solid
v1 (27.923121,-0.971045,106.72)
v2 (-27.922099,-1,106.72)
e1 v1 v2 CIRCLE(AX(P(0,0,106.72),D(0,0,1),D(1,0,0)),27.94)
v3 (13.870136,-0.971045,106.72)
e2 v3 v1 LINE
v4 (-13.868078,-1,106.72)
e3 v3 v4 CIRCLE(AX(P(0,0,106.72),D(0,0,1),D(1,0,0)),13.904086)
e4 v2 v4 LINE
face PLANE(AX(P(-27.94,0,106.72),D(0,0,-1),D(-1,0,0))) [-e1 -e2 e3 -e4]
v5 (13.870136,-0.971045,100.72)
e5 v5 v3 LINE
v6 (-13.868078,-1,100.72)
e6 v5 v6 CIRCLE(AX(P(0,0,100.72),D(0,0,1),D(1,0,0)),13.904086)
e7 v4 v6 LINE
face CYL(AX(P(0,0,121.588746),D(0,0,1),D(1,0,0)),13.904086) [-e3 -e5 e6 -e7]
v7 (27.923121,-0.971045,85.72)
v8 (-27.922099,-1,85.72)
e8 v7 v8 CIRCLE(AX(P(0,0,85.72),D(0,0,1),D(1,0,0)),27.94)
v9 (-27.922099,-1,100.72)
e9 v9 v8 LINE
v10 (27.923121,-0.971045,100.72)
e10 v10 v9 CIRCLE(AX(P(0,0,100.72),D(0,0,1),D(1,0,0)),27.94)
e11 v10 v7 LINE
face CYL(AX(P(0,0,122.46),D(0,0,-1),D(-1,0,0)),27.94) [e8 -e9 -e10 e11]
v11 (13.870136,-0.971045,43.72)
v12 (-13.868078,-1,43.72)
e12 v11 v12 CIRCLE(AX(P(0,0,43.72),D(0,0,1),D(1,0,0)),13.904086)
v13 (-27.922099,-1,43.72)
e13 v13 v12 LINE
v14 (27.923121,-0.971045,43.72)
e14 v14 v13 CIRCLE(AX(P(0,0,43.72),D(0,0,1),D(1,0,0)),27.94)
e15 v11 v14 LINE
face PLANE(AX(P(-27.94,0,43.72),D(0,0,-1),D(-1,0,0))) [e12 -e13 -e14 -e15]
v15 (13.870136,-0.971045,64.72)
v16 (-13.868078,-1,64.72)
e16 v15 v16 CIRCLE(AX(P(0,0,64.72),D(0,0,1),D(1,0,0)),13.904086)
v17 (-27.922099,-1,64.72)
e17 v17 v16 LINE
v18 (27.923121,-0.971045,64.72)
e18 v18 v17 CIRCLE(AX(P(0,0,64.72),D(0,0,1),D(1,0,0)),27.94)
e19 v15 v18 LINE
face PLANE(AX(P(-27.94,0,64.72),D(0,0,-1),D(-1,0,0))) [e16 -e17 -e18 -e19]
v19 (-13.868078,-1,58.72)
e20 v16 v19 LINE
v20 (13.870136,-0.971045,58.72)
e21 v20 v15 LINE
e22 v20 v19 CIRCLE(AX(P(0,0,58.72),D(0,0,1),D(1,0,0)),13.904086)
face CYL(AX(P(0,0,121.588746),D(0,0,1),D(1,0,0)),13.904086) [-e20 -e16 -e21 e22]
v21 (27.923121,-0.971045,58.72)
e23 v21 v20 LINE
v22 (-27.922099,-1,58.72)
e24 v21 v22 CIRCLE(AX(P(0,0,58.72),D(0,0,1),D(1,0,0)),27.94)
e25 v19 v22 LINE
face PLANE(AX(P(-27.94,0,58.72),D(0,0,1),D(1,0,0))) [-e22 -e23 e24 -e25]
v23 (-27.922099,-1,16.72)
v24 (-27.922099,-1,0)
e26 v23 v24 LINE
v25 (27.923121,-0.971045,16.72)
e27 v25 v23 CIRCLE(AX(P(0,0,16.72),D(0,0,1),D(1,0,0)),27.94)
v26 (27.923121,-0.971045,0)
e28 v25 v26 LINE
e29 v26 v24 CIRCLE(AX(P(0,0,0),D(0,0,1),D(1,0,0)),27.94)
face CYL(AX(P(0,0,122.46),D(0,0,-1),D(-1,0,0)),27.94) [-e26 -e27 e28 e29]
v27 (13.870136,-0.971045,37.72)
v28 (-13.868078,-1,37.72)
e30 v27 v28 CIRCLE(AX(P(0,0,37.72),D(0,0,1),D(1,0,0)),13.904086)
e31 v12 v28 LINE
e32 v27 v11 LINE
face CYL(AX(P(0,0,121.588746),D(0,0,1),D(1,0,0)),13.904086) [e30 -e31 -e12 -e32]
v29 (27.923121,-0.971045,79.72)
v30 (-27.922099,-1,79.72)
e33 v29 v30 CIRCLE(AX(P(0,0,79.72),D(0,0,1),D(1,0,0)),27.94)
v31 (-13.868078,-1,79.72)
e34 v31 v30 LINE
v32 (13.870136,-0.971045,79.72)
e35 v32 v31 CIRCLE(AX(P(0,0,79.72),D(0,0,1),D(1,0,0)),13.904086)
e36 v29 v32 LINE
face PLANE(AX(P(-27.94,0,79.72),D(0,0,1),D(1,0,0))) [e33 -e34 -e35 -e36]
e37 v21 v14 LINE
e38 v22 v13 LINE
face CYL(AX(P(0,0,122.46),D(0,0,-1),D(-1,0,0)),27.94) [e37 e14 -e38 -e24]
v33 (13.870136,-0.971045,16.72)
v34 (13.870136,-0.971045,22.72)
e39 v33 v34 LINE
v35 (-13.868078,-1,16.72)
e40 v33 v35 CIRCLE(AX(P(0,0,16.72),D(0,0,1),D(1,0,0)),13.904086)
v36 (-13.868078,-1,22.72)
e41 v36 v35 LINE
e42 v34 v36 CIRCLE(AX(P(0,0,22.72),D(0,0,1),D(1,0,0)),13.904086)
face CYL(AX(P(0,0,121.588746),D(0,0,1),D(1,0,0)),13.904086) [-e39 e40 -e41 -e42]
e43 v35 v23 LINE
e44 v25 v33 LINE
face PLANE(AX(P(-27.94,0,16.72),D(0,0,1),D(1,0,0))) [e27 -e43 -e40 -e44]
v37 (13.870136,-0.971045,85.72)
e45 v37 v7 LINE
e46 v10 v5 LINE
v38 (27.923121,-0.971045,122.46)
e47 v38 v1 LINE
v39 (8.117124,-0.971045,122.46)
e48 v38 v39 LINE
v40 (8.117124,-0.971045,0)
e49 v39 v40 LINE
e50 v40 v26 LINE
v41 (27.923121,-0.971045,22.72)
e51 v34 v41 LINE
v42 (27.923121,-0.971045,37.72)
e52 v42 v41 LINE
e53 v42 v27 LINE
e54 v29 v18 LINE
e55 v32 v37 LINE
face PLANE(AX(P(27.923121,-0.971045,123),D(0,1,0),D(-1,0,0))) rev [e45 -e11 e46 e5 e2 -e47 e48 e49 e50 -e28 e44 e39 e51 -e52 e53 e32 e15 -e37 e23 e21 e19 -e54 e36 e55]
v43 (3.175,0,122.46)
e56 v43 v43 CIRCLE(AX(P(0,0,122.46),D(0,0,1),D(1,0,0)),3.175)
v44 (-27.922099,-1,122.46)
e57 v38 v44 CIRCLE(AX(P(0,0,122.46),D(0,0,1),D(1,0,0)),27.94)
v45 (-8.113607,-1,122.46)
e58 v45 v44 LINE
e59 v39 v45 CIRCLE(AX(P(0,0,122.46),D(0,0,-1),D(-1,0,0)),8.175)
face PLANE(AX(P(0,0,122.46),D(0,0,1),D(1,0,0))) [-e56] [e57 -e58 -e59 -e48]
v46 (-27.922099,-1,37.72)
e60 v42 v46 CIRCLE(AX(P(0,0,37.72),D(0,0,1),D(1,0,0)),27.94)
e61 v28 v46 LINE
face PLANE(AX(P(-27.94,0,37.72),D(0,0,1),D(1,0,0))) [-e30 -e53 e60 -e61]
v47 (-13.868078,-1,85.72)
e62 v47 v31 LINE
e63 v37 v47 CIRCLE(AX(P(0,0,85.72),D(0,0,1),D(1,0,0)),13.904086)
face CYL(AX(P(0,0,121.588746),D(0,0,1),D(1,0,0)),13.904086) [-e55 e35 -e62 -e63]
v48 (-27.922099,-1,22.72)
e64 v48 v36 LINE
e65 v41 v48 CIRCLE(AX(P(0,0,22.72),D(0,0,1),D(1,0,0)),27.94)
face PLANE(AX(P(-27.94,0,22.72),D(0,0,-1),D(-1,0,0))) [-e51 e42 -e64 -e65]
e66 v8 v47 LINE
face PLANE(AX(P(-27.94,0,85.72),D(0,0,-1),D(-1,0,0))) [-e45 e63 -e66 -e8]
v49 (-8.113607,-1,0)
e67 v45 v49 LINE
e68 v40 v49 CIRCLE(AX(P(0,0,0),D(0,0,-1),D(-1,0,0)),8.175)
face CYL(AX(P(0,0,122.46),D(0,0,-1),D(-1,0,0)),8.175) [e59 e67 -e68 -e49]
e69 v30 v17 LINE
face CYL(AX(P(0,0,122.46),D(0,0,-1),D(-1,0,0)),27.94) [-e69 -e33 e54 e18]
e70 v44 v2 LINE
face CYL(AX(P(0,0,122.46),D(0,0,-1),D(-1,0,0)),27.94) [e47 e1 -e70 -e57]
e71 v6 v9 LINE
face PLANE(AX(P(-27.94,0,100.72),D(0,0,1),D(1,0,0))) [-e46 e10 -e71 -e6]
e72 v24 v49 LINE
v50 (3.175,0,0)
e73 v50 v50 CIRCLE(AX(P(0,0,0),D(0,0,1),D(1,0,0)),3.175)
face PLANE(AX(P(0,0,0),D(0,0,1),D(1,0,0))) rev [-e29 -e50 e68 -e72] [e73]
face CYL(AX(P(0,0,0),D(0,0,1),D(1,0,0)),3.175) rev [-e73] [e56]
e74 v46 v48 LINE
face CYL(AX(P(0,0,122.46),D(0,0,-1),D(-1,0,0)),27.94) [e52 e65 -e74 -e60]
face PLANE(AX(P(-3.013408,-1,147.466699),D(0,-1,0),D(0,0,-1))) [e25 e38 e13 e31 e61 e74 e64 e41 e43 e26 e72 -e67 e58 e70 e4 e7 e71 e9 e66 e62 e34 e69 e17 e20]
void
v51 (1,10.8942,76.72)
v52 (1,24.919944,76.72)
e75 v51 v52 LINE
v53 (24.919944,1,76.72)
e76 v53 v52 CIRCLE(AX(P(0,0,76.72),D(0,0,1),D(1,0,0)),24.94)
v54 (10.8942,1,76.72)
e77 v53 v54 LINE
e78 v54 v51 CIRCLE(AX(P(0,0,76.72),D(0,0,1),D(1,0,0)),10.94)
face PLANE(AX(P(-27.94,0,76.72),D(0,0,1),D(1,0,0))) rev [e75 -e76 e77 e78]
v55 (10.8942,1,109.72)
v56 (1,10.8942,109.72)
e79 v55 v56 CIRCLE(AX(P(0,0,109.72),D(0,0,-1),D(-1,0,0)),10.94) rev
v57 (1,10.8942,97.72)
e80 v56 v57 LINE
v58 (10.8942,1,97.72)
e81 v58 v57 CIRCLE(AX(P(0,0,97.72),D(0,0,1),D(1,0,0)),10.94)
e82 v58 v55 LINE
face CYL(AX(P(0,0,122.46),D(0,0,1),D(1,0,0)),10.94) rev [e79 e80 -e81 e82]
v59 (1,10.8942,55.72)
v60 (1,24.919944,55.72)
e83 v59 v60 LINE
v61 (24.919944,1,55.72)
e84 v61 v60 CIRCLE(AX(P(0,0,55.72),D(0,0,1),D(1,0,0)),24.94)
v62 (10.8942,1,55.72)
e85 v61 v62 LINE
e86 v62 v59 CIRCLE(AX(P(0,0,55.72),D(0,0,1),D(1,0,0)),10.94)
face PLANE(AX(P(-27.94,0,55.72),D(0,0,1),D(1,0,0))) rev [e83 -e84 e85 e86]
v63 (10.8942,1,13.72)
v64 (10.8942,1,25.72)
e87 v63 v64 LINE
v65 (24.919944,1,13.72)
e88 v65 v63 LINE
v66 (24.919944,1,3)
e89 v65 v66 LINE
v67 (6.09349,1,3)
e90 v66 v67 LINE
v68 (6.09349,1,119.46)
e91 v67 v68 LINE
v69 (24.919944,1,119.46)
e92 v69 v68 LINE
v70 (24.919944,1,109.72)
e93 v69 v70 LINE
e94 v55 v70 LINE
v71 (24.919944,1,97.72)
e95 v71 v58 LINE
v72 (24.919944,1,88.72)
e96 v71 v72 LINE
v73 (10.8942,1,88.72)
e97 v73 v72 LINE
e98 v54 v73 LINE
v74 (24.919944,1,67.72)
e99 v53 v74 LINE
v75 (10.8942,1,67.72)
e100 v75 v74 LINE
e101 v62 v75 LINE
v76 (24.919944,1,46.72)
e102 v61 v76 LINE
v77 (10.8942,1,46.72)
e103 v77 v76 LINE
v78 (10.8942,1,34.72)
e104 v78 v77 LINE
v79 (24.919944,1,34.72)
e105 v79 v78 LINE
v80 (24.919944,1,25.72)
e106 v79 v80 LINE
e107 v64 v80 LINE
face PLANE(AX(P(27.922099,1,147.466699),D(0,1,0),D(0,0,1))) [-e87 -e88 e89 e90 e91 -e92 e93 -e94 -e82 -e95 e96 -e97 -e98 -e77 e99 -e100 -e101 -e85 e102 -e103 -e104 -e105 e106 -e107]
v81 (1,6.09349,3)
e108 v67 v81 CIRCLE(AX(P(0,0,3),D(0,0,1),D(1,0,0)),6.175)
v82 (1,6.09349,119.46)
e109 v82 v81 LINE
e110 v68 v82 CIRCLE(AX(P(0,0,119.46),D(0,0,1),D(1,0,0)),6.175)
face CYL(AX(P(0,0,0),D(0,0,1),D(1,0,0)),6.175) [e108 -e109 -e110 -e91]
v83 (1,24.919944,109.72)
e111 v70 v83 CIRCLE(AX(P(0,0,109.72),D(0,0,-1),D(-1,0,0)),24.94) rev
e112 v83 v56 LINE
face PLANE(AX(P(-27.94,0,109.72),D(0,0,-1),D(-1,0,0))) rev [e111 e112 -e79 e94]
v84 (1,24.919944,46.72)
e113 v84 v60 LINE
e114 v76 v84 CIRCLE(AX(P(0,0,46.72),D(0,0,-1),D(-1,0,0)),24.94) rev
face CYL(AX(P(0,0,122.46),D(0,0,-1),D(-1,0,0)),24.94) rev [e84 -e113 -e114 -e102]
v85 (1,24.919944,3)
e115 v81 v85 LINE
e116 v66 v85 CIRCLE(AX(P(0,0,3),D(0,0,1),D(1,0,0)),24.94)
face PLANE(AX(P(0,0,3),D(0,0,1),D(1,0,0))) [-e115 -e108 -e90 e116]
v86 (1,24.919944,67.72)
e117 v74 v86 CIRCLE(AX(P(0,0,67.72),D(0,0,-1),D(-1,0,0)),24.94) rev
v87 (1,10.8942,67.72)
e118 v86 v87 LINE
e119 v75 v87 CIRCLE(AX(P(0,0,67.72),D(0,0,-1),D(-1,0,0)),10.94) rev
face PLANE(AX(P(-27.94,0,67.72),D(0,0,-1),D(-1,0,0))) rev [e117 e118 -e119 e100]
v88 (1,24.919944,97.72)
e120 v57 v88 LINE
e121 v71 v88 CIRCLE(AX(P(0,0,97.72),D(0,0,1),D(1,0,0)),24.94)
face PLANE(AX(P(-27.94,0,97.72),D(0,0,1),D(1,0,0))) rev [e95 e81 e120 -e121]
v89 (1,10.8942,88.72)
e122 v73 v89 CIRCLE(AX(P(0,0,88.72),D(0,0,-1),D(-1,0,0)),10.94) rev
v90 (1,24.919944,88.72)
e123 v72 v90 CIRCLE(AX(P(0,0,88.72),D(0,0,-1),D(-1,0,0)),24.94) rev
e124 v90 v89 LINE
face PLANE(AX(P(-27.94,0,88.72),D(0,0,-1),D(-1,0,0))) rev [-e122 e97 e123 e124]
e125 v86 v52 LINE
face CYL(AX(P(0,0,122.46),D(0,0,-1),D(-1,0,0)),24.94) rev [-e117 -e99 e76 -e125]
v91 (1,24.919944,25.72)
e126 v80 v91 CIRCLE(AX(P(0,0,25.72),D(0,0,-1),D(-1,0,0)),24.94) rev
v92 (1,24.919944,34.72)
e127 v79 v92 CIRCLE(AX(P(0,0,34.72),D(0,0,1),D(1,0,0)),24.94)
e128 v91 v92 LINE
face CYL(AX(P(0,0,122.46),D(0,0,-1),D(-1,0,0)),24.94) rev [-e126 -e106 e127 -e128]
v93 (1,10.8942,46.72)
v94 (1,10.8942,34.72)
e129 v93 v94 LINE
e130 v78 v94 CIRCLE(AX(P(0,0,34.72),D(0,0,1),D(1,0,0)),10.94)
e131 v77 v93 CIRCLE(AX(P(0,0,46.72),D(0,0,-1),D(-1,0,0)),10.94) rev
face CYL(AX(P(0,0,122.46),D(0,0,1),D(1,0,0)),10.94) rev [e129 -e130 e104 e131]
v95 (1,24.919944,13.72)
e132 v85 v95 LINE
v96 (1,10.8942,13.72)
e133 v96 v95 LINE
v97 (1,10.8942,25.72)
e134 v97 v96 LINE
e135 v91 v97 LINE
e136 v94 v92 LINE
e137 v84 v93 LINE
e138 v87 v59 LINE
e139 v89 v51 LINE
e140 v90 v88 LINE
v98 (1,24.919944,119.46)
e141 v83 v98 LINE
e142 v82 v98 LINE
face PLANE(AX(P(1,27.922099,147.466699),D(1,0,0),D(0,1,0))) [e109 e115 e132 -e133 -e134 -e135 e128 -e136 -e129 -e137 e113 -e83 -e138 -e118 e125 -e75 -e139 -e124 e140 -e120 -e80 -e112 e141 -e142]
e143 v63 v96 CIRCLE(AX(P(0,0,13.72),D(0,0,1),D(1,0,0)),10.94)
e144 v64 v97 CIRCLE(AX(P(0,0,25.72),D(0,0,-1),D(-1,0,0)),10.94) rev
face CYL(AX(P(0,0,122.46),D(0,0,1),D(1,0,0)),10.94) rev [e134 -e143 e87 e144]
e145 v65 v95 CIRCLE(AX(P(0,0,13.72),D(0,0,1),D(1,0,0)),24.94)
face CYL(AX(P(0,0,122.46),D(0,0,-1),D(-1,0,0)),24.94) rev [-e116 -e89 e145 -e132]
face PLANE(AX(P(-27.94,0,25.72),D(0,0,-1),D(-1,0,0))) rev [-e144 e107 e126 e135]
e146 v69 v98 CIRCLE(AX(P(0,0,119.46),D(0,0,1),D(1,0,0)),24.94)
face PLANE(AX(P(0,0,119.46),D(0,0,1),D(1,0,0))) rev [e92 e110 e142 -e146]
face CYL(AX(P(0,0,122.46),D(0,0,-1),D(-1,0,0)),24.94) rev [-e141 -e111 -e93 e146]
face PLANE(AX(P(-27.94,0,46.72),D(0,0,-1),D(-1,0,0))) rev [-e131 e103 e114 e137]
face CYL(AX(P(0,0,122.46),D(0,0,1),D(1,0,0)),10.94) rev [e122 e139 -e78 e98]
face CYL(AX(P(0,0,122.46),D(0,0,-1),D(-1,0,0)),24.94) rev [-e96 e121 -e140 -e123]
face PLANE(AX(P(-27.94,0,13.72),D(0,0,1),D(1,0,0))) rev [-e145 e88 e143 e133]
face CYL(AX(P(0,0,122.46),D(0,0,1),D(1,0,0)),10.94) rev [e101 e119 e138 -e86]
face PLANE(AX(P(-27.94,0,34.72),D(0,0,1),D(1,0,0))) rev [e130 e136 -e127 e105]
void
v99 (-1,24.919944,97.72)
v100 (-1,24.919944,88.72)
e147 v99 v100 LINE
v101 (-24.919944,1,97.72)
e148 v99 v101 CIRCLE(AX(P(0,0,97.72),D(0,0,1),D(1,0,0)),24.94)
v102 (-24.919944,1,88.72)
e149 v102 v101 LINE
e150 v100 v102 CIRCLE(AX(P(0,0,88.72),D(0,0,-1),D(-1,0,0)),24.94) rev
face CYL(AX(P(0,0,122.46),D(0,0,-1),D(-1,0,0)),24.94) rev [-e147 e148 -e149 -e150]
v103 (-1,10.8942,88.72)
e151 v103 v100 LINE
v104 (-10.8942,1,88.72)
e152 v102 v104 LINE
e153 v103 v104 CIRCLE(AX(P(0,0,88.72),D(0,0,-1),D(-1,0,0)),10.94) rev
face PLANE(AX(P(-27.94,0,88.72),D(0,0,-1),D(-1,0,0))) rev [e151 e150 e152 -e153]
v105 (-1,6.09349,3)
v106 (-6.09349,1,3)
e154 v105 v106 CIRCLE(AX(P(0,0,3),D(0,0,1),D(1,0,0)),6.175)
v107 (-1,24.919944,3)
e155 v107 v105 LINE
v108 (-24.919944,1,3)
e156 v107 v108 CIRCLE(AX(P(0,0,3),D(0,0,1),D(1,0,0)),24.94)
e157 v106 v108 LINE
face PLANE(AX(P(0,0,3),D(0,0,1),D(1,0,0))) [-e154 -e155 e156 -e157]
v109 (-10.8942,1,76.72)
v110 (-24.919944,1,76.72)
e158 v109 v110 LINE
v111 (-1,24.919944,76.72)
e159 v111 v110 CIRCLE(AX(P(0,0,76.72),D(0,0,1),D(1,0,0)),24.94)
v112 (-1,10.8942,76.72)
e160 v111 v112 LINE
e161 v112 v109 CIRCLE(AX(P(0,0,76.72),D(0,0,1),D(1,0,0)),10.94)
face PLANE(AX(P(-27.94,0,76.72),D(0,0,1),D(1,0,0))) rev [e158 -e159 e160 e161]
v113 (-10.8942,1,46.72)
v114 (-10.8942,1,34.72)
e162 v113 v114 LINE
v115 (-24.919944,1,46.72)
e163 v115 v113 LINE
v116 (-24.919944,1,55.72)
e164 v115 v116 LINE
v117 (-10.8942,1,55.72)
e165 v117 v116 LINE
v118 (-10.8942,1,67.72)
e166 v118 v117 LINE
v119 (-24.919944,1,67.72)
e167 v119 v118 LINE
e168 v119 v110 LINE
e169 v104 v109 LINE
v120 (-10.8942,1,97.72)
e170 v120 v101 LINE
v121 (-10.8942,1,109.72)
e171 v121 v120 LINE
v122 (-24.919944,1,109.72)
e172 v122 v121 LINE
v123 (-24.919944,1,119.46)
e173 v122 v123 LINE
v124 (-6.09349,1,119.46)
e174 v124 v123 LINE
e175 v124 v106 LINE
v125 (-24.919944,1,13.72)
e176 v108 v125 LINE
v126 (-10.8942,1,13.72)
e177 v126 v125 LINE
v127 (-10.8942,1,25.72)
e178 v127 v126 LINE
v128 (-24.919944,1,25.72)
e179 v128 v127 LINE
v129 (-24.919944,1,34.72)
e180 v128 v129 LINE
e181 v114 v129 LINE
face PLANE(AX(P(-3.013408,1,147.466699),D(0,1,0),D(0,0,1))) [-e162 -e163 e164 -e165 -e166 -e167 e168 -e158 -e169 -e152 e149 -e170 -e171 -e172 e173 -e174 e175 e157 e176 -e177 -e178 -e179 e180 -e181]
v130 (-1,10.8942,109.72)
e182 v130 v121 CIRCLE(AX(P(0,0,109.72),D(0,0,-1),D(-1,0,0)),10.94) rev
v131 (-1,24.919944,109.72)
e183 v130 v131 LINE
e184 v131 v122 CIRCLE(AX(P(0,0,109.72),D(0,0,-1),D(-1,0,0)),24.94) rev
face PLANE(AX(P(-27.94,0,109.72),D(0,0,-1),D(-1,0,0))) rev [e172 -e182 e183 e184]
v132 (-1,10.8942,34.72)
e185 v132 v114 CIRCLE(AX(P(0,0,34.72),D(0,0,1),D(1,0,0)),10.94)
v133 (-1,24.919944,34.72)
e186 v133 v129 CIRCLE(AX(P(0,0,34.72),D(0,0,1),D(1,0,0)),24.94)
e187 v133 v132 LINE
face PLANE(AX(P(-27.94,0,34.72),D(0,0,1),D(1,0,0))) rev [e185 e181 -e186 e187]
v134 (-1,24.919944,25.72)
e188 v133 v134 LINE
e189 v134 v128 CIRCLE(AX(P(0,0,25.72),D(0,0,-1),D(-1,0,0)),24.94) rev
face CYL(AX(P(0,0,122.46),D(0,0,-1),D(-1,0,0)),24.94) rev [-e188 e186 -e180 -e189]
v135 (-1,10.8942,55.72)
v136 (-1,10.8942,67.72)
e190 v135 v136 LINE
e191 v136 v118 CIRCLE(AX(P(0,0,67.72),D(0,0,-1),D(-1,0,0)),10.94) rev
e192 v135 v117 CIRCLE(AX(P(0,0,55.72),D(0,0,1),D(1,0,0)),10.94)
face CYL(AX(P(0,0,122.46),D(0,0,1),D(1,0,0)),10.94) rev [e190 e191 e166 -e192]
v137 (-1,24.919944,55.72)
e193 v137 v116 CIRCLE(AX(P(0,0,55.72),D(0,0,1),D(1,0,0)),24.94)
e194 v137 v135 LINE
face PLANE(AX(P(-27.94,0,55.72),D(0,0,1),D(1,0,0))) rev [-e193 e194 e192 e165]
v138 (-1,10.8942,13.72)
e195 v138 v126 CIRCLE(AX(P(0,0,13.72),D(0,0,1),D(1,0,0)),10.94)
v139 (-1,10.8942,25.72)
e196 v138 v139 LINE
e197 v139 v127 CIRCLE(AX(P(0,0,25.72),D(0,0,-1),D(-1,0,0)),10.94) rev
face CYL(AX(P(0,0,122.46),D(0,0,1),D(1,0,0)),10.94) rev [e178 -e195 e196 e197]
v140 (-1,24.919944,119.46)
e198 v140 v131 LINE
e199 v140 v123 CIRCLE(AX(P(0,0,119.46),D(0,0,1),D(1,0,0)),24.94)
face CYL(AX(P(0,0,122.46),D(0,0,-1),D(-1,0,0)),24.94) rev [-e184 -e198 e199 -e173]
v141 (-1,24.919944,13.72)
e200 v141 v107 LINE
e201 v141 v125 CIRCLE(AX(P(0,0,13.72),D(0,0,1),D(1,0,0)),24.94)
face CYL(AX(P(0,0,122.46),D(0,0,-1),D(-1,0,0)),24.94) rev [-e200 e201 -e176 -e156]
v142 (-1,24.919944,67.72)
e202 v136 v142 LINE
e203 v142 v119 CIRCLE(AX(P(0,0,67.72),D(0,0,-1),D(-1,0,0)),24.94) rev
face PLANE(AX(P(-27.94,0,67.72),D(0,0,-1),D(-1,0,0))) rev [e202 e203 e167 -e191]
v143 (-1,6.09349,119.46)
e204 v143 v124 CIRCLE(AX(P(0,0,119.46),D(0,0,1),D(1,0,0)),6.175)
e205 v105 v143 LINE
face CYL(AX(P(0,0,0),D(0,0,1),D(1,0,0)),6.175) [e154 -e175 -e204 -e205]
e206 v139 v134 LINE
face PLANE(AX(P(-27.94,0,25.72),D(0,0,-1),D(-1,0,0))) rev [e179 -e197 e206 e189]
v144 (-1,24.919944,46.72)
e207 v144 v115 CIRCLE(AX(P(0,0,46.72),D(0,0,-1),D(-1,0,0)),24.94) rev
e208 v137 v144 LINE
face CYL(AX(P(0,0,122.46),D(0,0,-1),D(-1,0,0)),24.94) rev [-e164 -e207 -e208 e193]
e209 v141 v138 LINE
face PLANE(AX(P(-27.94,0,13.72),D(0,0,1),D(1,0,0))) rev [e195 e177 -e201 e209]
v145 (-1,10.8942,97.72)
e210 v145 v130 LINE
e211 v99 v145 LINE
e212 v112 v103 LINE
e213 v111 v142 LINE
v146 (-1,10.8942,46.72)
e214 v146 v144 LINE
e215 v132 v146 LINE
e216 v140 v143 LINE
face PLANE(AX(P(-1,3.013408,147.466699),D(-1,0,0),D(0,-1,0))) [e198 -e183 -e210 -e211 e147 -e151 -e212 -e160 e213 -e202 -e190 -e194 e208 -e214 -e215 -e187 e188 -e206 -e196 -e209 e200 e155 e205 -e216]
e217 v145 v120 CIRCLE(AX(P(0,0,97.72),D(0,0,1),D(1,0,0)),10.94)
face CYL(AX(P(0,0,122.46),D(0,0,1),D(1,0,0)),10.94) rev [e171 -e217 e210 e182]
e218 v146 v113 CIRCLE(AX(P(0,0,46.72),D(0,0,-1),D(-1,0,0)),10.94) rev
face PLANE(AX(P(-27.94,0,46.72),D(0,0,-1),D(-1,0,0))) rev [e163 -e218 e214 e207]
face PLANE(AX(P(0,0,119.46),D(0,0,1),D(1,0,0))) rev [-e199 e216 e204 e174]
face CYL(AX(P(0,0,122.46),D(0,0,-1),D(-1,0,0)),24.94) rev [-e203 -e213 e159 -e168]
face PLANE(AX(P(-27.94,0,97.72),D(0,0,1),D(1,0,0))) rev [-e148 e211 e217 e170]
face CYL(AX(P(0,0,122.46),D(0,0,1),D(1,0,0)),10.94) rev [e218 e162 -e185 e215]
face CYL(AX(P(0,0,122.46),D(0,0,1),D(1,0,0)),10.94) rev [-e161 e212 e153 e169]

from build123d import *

# Parameters (mm, degrees)
SKETCH3_R            = 27.94
BOSS_EXTRUDE2_DEPTH  = 122.46
SKETCH5_R            = 3.175
CUT_EXTRUDE1_DEPTH   = 129.676877488
SKETCH4_W            = 14
SKETCH4_H            = 6
SHELL1_START         = 3
SHELL1_OUTLINE_R     = 10.94
SHELL1_OUTLINE_R_2   = 6.175
SHELL1_DEPTH         = 116.46
SHELL1_2_OUTLINE_R   = 24.94
SHELL1_2_OUTLINE_R_2 = 10.94
SHELL1_2_DEPTH       = 10.72
SHELL1_START_2       = 109.72
SHELL1_3_OUTLINE_R   = 24.94
SHELL1_3_OUTLINE_R_2 = 10.94
SHELL1_3_DEPTH       = 9.74
SHELL1_START_3       = 25.72
SHELL1_4_OUTLINE_R   = 24.94
SHELL1_4_OUTLINE_R_2 = 10.94
SHELL1_4_DEPTH       = 9
SHELL1_START_4       = 46.72
SHELL1_5_OUTLINE_R   = 24.94
SHELL1_5_OUTLINE_R_2 = 10.94
SHELL1_5_DEPTH       = 9
SHELL1_START_5       = 67.72
SHELL1_6_OUTLINE_R   = 24.94
SHELL1_6_OUTLINE_R_2 = 10.94
SHELL1_6_DEPTH       = 9
SHELL1_START_6       = 88.72
SHELL1_7_OUTLINE_R   = 24.94
SHELL1_7_OUTLINE_R_2 = 10.94
SHELL1_7_DEPTH       = 9
BOSS_EXTRUDE3_REACH  = 130.677
SKETCH13_W           = 16.483162312
SKETCH13_H           = 6
CUT_EXTRUDE3_DEPTH   = 123
BOSS_EXTRUDE5_START  = -122.46
BOSS_EXTRUDE5_DEPTH  = 122.46


# Read off the part's stored shape, not the designer's step: Shell1
with BuildPart() as part:
    # Sketch3 → Boss-Extrude2 (new body)
    with BuildSketch(Plane.XY):
        Circle(SKETCH3_R)
    extrude(amount=BOSS_EXTRUDE2_DEPTH)

    # Sketch5 → Cut-Extrude1 (cut, through all)
    with BuildSketch(Plane.XY.offset(122.46)):
        Circle(SKETCH5_R)
    extrude(amount=-CUT_EXTRUDE1_DEPTH, mode=Mode.SUBTRACT)

    # Sketch4 → Cut-Revolve1 (revolve, cut)
    with BuildSketch(Plane(origin=(0, 0, 0), x_dir=(1, 0, 0), z_dir=(0, 1, 0)), mode=Mode.PRIVATE) as cut_revolve1_sk:
        with Locations((-20.94, -103.72)):
            Rectangle(SKETCH4_W, SKETCH4_H)
        with Locations((-20.94, -82.72)):
            Rectangle(SKETCH4_W, SKETCH4_H)
        with Locations((-20.94, -61.72)):
            Rectangle(SKETCH4_W, SKETCH4_H)
        with Locations((-20.94, -40.72)):
            Rectangle(SKETCH4_W, SKETCH4_H)
        with Locations((-20.94, -19.72)):
            Rectangle(SKETCH4_W, SKETCH4_H)
    revolve(cut_revolve1_sk.sketch.rotate(Axis((0, 0, 122.46), (0, 0, -1)), 180), axis=Axis((0, 0, 122.46), (0, 0, -1)), mode=Mode.SUBTRACT)

    # Shell1 outline → Shell1 (cut)
    with BuildSketch(Plane.XY.offset(SHELL1_START)):
        Circle(SHELL1_OUTLINE_R)
        Circle(SHELL1_OUTLINE_R_2, mode=Mode.SUBTRACT)
    extrude(amount=SHELL1_DEPTH, mode=Mode.SUBTRACT)

    # Shell1 2 outline → Shell1 2 (cut)
    with BuildSketch(Plane.XY.offset(SHELL1_START)):
        Circle(SHELL1_2_OUTLINE_R)
        Circle(SHELL1_2_OUTLINE_R_2, mode=Mode.SUBTRACT)
    extrude(amount=SHELL1_2_DEPTH, mode=Mode.SUBTRACT)

    # Shell1 3 outline → Shell1 3 (cut)
    with BuildSketch(Plane.XY.offset(SHELL1_START_2)):
        Circle(SHELL1_3_OUTLINE_R)
        Circle(SHELL1_3_OUTLINE_R_2, mode=Mode.SUBTRACT)
    extrude(amount=SHELL1_3_DEPTH, mode=Mode.SUBTRACT)

    # Shell1 4 outline → Shell1 4 (cut)
    with BuildSketch(Plane.XY.offset(SHELL1_START_3)):
        Circle(SHELL1_4_OUTLINE_R)
        Circle(SHELL1_4_OUTLINE_R_2, mode=Mode.SUBTRACT)
    extrude(amount=SHELL1_4_DEPTH, mode=Mode.SUBTRACT)

    # Shell1 5 outline → Shell1 5 (cut)
    with BuildSketch(Plane.XY.offset(SHELL1_START_4)):
        Circle(SHELL1_5_OUTLINE_R)
        Circle(SHELL1_5_OUTLINE_R_2, mode=Mode.SUBTRACT)
    extrude(amount=SHELL1_5_DEPTH, mode=Mode.SUBTRACT)

    # Shell1 6 outline → Shell1 6 (cut)
    with BuildSketch(Plane.XY.offset(SHELL1_START_5)):
        Circle(SHELL1_6_OUTLINE_R)
        Circle(SHELL1_6_OUTLINE_R_2, mode=Mode.SUBTRACT)
    extrude(amount=SHELL1_6_DEPTH, mode=Mode.SUBTRACT)

    # Shell1 7 outline → Shell1 7 (cut)
    with BuildSketch(Plane.XY.offset(SHELL1_START_6)):
        Circle(SHELL1_7_OUTLINE_R)
        Circle(SHELL1_7_OUTLINE_R_2, mode=Mode.SUBTRACT)
    extrude(amount=SHELL1_7_DEPTH, mode=Mode.SUBTRACT)

    # Boss-Extrude3: up to this face of the body (flat: up to its plane)
    boss_extrude3_end = Plane(part.part.faces().sort_by_distance((-27.149737461, 0, 122.46))[0])
    # Sketch10 → Boss-Extrude3 (add, up to the picked face)
    with BuildSketch(Plane(origin=(0, 0, 0), x_dir=(-1, 0, 0), z_dir=(0, 0, -1)), mode=Mode.PRIVATE) as boss_extrude3_sk1:
        with BuildLine():
            Line((-1, 27.922098775), (-1, 3.01340754))
            ThreePointArc((-1, 3.01340754), (0, 3.175), (1, 3.01340754))
            Line((1, 3.01340754), (1, 27.922098775))
            ThreePointArc((1, 27.922098775), (0, 27.94), (-1, 27.922098775))
        make_face()
    boss_extrude3_tool1 = split(extrude(boss_extrude3_sk1.sketch, amount=-BOSS_EXTRUDE3_REACH, mode=Mode.PRIVATE), bisect_by=boss_extrude3_end, keep=Keep.BOTH, mode=Mode.PRIVATE)
    # Sketch10 → Boss-Extrude3 (add, up to the picked face)
    with BuildSketch(Plane(origin=(0, 0, 0), x_dir=(-1, 0, 0), z_dir=(0, 0, -1)), mode=Mode.PRIVATE) as boss_extrude3_sk2:
        with BuildLine():
            Line((3.01340754, 1), (27.922098775, 1))
            ThreePointArc((27.922098775, 1), (27.94, 0), (27.922098775, -1))
            Line((27.922098775, -1), (3.01340754, -1))
            ThreePointArc((3.01340754, -1), (3.175, 0), (3.01340754, 1))
        make_face()
    boss_extrude3_tool2 = split(extrude(boss_extrude3_sk2.sketch, amount=-BOSS_EXTRUDE3_REACH, mode=Mode.PRIVATE), bisect_by=boss_extrude3_end, keep=Keep.BOTH, mode=Mode.PRIVATE)
    # Sketch10 → Boss-Extrude3 (add, up to the picked face)
    with BuildSketch(Plane(origin=(0, 0, 0), x_dir=(-1, 0, 0), z_dir=(0, 0, -1)), mode=Mode.PRIVATE) as boss_extrude3_sk3:
        with BuildLine():
            Line((-1, -3.01340754), (-1, -27.922098775))
            ThreePointArc((-1, -27.922098775), (0, -27.94), (1, -27.922098775))
            Line((1, -27.922098775), (1, -3.01340754))
            ThreePointArc((1, -3.01340754), (0, -3.175), (-1, -3.01340754))
        make_face()
    boss_extrude3_tool3 = split(extrude(boss_extrude3_sk3.sketch, amount=-BOSS_EXTRUDE3_REACH, mode=Mode.PRIVATE), bisect_by=boss_extrude3_end, keep=Keep.BOTH, mode=Mode.PRIVATE)
    # Sketch10 → Boss-Extrude3 (add, up to the picked face)
    with BuildSketch(Plane(origin=(0, 0, 0), x_dir=(-1, 0, 0), z_dir=(0, 0, -1)), mode=Mode.PRIVATE) as boss_extrude3_sk4:
        with BuildLine():
            Line((-27.922098775, -1), (-3.01340754, -1))
            ThreePointArc((-3.01340754, -1), (-3.175, 0), (-3.01340754, 1))
            Line((-3.01340754, 1), (-27.922098775, 1))
            ThreePointArc((-27.922098775, 1), (-27.94, 0), (-27.922098775, -1))
        make_face()
    boss_extrude3_tool4 = split(extrude(boss_extrude3_sk4.sketch, amount=-BOSS_EXTRUDE3_REACH, mode=Mode.PRIVATE), bisect_by=boss_extrude3_end, keep=Keep.BOTH, mode=Mode.PRIVATE)
    add(boss_extrude3_tool1.solids().sort_by(Axis((0, 15.527819, 0), (0, 0, 1)))[0])
    add(boss_extrude3_tool2.solids().sort_by(Axis((-15.527819, 0, 0), (0, 0, 1)))[0])
    add(boss_extrude3_tool3.solids().sort_by(Axis((0, -15.527819, 0), (0, 0, 1)))[0])
    add(boss_extrude3_tool4.solids().sort_by(Axis((15.527819, 0, 0), (0, 0, 1)))[0])

    # Sketch13 → Cut-Revolve2 (revolve, cut)
    with BuildSketch(Plane(origin=(0, 0, 0), x_dir=(1, 0, 0), z_dir=(0, 1, 0)), mode=Mode.PRIVATE) as cut_revolve2_sk:
        with Locations((-22.145666886, -40.72)):
            Rectangle(SKETCH13_W, SKETCH13_H)
        with Locations((-22.145666886, -19.72)):
            Rectangle(SKETCH13_W, SKETCH13_H)
        with Locations((-22.145666886, -61.72)):
            Rectangle(SKETCH13_W, SKETCH13_H)
        with Locations((-22.145666886, -82.72)):
            Rectangle(SKETCH13_W, SKETCH13_H)
        with Locations((-22.145666886, -103.72)):
            Rectangle(SKETCH13_W, SKETCH13_H)
    revolve(cut_revolve2_sk.sketch.rotate(Axis((0, 0, 121.588746248), (0, 0, -1)), 180), axis=Axis((0, 0, 121.588746248), (0, 0, -1)), mode=Mode.SUBTRACT)

    # Sketch16 → Cut-Extrude3 (cut)
    with BuildSketch(Plane(origin=(0, 0, 0), x_dir=(-1, 0, 0), z_dir=(0, 0, -1))):
        with BuildLine():
            Line((-27.923120749, -0.971044624), (-6.098171639, -0.971044624))
            ThreePointArc((-6.098171639, -0.971044624), (-0.014665674, -6.174982584), (6.093490379, -1))
            Line((6.093490379, -1), (27.922098775, -1))
            ThreePointArc((27.922098775, -1), (-0.014486703, -27.939996244), (-27.923120749, -0.971044624))
        make_face()
    extrude(amount=-CUT_EXTRUDE3_DEPTH, mode=Mode.SUBTRACT)

    # Sketch18 → Boss-Extrude5 (add)
    with BuildSketch(Plane(origin=(0, 0, 0), x_dir=(-1, 0, 0), z_dir=(0, 0, -1)).offset(BOSS_EXTRUDE5_START)):
        with BuildLine():
            Line((-3.175, 0), (-8.175, 0))
            ThreePointArc((-8.175, 0), (0, -8.175), (8.175, 0))
            Line((8.175, 0), (3.175, 0))
            ThreePointArc((3.175, 0), (0, -3.175), (-3.175, 0))
        make_face()
    extrude(amount=BOSS_EXTRUDE5_DEPTH)


solid = part.part
